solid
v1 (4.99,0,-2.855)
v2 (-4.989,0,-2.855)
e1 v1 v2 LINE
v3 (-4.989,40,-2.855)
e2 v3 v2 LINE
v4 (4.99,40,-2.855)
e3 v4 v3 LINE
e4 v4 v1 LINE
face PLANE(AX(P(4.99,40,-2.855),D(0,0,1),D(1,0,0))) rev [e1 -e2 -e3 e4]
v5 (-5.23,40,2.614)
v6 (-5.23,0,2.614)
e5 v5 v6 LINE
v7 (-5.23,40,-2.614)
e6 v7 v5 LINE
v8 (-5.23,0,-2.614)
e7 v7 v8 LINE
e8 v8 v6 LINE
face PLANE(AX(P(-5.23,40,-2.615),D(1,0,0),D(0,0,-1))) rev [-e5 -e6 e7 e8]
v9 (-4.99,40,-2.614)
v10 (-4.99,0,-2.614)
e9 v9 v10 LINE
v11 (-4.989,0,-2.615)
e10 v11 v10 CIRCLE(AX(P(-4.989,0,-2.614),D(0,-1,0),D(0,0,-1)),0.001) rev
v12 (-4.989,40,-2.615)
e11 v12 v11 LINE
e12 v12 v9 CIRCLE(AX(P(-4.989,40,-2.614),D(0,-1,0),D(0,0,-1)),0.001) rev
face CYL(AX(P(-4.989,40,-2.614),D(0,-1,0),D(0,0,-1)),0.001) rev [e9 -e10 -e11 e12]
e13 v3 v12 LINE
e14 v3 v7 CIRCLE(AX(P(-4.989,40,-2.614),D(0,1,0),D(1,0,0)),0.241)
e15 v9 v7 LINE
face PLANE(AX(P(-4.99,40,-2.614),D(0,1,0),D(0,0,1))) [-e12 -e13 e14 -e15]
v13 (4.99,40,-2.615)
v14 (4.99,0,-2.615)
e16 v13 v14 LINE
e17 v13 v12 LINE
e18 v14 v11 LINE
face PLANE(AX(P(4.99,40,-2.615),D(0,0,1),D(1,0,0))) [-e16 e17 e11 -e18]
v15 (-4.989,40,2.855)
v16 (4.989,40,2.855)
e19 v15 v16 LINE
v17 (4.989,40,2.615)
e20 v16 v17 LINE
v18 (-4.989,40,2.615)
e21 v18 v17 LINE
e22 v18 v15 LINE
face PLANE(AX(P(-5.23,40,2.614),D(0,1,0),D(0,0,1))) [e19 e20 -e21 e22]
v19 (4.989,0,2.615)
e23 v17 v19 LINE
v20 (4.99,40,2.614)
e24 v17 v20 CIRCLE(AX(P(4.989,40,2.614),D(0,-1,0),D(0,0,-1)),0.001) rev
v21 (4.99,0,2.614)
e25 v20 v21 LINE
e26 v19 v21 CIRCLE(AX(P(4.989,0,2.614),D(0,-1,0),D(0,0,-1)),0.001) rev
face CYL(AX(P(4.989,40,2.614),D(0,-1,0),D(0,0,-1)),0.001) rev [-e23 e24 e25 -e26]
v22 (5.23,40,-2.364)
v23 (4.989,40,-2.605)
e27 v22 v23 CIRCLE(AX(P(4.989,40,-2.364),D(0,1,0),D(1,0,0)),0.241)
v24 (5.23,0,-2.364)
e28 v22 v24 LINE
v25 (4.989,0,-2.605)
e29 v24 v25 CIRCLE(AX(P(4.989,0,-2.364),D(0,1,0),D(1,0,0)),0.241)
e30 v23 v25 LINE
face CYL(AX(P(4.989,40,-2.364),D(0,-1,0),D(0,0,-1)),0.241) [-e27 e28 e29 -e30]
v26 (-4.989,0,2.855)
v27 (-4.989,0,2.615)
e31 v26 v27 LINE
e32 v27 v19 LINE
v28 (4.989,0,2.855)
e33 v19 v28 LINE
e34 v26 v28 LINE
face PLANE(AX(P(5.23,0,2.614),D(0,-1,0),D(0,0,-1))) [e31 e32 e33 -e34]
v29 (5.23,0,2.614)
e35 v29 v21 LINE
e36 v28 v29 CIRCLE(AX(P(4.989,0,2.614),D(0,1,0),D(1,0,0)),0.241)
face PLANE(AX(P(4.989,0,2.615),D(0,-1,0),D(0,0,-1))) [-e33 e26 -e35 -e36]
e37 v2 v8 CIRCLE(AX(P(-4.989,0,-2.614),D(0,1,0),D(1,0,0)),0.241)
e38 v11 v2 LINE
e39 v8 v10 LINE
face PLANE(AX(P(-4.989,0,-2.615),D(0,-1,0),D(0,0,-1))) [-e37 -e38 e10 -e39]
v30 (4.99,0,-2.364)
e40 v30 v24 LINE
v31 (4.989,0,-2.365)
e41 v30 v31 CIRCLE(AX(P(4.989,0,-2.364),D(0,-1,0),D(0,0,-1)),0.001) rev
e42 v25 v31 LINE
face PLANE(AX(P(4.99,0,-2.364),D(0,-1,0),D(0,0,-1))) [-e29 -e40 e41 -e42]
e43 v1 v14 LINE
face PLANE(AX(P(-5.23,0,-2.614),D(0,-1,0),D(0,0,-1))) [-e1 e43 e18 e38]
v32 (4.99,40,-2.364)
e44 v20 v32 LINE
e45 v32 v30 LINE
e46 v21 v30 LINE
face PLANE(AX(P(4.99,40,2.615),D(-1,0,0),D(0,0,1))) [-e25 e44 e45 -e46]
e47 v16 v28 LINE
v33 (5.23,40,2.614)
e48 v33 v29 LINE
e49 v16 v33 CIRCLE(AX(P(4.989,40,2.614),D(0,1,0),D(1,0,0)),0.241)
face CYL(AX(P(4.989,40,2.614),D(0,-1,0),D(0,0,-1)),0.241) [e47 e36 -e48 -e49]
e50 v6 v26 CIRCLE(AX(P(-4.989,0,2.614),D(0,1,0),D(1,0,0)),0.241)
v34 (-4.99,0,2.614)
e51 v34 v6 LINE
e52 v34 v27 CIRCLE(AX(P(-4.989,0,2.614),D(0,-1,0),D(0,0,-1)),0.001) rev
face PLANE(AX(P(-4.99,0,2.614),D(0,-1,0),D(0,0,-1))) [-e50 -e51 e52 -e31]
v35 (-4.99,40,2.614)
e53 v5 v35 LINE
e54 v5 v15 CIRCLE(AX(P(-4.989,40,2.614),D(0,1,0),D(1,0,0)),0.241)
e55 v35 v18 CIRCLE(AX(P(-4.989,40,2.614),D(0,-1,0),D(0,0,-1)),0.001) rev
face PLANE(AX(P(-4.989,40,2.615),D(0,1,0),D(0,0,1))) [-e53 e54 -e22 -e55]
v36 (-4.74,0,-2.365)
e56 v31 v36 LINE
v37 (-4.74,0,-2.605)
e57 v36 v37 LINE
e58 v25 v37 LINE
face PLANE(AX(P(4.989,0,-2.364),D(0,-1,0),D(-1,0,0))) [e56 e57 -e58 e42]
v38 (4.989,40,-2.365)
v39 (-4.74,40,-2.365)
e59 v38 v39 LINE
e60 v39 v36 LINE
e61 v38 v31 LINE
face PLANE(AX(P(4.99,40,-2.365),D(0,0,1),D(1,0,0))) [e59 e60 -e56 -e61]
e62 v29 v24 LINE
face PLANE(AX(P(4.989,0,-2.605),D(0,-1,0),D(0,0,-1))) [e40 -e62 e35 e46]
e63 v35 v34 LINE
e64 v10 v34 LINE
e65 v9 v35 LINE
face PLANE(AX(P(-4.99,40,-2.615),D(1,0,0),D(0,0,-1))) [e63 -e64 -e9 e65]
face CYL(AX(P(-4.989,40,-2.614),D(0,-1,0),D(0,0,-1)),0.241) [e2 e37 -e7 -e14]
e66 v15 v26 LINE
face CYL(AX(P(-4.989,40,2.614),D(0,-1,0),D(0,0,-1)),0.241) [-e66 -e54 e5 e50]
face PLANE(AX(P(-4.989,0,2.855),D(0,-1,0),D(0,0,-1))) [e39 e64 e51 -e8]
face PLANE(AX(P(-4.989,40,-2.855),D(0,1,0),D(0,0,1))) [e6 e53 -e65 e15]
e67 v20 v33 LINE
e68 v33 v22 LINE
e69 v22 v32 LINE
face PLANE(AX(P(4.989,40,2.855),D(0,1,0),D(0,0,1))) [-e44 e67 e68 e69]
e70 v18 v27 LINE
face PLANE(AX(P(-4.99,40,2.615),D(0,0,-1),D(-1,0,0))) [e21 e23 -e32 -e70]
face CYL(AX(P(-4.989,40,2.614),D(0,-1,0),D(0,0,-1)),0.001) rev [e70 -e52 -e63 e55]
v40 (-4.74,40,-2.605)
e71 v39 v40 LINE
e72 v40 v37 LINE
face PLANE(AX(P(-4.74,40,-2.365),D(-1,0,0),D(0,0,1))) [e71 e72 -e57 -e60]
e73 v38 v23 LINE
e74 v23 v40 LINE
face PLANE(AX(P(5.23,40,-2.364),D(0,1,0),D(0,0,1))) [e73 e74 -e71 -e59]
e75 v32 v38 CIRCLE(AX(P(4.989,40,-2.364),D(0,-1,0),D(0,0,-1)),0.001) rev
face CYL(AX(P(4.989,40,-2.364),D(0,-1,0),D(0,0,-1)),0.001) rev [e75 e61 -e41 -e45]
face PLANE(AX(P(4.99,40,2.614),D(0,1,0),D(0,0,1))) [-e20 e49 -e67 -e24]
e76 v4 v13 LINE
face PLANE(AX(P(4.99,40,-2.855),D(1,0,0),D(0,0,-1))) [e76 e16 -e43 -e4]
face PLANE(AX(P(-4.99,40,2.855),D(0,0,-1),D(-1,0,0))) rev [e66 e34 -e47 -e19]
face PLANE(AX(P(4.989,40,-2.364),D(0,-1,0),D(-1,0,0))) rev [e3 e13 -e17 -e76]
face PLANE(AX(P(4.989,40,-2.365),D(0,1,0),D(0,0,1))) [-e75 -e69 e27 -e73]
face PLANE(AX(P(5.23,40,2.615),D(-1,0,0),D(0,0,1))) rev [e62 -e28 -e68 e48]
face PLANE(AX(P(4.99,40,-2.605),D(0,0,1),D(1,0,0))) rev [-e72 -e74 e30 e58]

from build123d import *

# Parameters (mm, degrees)
FLANGE_BASE1_DEPTH = 40


# Sheet-metal steps are written as plain solids
with BuildPart() as part:
    # Esboço1 → Flange-base1 (new body)
    with BuildSketch(Plane(origin=(0, 0, 0), x_dir=(1, 0, 0), z_dir=(0, 1, 0))):
        with BuildLine():
            Line((4.99, 2.615), (-4.989, 2.615))
            ThreePointArc((-4.989, 2.615), (-4.989707107, 2.614707107), (-4.99, 2.614))
            Line((-4.99, 2.614), (-4.99, -2.614))
            ThreePointArc((-4.99, -2.614), (-4.989707107, -2.614707107), (-4.989, -2.615))
            Line((-4.989, -2.615), (4.989, -2.615))
            ThreePointArc((4.989, -2.615), (4.989707107, -2.614707107), (4.99, -2.614))
            Line((4.99, -2.614), (4.99, 2.364))
            ThreePointArc((4.99, 2.364), (4.989707107, 2.364707107), (4.989, 2.365))
            Line((4.989, 2.365), (-4.74, 2.365))
            Line((-4.74, 2.365), (-4.74, 2.605))
            Line((-4.74, 2.605), (4.989, 2.605))
            ThreePointArc((4.989, 2.605), (5.159412734, 2.534412734), (5.23, 2.364))
            Line((5.23, 2.364), (5.23, -2.614))
            ThreePointArc((5.229999999, -2.614), (5.159412734, -2.784412735), (4.988999999, -2.855))
            Line((4.989, -2.855), (-4.989, -2.855))
            ThreePointArc((-4.988999999, -2.855), (-5.15941275, -2.784412718), (-5.23, -2.613999954))
            Line((-5.23, -2.613999954), (-5.23, 2.613998659))
            ThreePointArc((-5.23, 2.613998659), (-5.159413186, 2.784412283), (-4.988999936, 2.855))
            Line((-4.988999936, 2.855), (4.99, 2.855))
            Line((4.99, 2.855), (4.99, 2.615))
        make_face()
    extrude(amount=FLANGE_BASE1_DEPTH)


solid = part.part
